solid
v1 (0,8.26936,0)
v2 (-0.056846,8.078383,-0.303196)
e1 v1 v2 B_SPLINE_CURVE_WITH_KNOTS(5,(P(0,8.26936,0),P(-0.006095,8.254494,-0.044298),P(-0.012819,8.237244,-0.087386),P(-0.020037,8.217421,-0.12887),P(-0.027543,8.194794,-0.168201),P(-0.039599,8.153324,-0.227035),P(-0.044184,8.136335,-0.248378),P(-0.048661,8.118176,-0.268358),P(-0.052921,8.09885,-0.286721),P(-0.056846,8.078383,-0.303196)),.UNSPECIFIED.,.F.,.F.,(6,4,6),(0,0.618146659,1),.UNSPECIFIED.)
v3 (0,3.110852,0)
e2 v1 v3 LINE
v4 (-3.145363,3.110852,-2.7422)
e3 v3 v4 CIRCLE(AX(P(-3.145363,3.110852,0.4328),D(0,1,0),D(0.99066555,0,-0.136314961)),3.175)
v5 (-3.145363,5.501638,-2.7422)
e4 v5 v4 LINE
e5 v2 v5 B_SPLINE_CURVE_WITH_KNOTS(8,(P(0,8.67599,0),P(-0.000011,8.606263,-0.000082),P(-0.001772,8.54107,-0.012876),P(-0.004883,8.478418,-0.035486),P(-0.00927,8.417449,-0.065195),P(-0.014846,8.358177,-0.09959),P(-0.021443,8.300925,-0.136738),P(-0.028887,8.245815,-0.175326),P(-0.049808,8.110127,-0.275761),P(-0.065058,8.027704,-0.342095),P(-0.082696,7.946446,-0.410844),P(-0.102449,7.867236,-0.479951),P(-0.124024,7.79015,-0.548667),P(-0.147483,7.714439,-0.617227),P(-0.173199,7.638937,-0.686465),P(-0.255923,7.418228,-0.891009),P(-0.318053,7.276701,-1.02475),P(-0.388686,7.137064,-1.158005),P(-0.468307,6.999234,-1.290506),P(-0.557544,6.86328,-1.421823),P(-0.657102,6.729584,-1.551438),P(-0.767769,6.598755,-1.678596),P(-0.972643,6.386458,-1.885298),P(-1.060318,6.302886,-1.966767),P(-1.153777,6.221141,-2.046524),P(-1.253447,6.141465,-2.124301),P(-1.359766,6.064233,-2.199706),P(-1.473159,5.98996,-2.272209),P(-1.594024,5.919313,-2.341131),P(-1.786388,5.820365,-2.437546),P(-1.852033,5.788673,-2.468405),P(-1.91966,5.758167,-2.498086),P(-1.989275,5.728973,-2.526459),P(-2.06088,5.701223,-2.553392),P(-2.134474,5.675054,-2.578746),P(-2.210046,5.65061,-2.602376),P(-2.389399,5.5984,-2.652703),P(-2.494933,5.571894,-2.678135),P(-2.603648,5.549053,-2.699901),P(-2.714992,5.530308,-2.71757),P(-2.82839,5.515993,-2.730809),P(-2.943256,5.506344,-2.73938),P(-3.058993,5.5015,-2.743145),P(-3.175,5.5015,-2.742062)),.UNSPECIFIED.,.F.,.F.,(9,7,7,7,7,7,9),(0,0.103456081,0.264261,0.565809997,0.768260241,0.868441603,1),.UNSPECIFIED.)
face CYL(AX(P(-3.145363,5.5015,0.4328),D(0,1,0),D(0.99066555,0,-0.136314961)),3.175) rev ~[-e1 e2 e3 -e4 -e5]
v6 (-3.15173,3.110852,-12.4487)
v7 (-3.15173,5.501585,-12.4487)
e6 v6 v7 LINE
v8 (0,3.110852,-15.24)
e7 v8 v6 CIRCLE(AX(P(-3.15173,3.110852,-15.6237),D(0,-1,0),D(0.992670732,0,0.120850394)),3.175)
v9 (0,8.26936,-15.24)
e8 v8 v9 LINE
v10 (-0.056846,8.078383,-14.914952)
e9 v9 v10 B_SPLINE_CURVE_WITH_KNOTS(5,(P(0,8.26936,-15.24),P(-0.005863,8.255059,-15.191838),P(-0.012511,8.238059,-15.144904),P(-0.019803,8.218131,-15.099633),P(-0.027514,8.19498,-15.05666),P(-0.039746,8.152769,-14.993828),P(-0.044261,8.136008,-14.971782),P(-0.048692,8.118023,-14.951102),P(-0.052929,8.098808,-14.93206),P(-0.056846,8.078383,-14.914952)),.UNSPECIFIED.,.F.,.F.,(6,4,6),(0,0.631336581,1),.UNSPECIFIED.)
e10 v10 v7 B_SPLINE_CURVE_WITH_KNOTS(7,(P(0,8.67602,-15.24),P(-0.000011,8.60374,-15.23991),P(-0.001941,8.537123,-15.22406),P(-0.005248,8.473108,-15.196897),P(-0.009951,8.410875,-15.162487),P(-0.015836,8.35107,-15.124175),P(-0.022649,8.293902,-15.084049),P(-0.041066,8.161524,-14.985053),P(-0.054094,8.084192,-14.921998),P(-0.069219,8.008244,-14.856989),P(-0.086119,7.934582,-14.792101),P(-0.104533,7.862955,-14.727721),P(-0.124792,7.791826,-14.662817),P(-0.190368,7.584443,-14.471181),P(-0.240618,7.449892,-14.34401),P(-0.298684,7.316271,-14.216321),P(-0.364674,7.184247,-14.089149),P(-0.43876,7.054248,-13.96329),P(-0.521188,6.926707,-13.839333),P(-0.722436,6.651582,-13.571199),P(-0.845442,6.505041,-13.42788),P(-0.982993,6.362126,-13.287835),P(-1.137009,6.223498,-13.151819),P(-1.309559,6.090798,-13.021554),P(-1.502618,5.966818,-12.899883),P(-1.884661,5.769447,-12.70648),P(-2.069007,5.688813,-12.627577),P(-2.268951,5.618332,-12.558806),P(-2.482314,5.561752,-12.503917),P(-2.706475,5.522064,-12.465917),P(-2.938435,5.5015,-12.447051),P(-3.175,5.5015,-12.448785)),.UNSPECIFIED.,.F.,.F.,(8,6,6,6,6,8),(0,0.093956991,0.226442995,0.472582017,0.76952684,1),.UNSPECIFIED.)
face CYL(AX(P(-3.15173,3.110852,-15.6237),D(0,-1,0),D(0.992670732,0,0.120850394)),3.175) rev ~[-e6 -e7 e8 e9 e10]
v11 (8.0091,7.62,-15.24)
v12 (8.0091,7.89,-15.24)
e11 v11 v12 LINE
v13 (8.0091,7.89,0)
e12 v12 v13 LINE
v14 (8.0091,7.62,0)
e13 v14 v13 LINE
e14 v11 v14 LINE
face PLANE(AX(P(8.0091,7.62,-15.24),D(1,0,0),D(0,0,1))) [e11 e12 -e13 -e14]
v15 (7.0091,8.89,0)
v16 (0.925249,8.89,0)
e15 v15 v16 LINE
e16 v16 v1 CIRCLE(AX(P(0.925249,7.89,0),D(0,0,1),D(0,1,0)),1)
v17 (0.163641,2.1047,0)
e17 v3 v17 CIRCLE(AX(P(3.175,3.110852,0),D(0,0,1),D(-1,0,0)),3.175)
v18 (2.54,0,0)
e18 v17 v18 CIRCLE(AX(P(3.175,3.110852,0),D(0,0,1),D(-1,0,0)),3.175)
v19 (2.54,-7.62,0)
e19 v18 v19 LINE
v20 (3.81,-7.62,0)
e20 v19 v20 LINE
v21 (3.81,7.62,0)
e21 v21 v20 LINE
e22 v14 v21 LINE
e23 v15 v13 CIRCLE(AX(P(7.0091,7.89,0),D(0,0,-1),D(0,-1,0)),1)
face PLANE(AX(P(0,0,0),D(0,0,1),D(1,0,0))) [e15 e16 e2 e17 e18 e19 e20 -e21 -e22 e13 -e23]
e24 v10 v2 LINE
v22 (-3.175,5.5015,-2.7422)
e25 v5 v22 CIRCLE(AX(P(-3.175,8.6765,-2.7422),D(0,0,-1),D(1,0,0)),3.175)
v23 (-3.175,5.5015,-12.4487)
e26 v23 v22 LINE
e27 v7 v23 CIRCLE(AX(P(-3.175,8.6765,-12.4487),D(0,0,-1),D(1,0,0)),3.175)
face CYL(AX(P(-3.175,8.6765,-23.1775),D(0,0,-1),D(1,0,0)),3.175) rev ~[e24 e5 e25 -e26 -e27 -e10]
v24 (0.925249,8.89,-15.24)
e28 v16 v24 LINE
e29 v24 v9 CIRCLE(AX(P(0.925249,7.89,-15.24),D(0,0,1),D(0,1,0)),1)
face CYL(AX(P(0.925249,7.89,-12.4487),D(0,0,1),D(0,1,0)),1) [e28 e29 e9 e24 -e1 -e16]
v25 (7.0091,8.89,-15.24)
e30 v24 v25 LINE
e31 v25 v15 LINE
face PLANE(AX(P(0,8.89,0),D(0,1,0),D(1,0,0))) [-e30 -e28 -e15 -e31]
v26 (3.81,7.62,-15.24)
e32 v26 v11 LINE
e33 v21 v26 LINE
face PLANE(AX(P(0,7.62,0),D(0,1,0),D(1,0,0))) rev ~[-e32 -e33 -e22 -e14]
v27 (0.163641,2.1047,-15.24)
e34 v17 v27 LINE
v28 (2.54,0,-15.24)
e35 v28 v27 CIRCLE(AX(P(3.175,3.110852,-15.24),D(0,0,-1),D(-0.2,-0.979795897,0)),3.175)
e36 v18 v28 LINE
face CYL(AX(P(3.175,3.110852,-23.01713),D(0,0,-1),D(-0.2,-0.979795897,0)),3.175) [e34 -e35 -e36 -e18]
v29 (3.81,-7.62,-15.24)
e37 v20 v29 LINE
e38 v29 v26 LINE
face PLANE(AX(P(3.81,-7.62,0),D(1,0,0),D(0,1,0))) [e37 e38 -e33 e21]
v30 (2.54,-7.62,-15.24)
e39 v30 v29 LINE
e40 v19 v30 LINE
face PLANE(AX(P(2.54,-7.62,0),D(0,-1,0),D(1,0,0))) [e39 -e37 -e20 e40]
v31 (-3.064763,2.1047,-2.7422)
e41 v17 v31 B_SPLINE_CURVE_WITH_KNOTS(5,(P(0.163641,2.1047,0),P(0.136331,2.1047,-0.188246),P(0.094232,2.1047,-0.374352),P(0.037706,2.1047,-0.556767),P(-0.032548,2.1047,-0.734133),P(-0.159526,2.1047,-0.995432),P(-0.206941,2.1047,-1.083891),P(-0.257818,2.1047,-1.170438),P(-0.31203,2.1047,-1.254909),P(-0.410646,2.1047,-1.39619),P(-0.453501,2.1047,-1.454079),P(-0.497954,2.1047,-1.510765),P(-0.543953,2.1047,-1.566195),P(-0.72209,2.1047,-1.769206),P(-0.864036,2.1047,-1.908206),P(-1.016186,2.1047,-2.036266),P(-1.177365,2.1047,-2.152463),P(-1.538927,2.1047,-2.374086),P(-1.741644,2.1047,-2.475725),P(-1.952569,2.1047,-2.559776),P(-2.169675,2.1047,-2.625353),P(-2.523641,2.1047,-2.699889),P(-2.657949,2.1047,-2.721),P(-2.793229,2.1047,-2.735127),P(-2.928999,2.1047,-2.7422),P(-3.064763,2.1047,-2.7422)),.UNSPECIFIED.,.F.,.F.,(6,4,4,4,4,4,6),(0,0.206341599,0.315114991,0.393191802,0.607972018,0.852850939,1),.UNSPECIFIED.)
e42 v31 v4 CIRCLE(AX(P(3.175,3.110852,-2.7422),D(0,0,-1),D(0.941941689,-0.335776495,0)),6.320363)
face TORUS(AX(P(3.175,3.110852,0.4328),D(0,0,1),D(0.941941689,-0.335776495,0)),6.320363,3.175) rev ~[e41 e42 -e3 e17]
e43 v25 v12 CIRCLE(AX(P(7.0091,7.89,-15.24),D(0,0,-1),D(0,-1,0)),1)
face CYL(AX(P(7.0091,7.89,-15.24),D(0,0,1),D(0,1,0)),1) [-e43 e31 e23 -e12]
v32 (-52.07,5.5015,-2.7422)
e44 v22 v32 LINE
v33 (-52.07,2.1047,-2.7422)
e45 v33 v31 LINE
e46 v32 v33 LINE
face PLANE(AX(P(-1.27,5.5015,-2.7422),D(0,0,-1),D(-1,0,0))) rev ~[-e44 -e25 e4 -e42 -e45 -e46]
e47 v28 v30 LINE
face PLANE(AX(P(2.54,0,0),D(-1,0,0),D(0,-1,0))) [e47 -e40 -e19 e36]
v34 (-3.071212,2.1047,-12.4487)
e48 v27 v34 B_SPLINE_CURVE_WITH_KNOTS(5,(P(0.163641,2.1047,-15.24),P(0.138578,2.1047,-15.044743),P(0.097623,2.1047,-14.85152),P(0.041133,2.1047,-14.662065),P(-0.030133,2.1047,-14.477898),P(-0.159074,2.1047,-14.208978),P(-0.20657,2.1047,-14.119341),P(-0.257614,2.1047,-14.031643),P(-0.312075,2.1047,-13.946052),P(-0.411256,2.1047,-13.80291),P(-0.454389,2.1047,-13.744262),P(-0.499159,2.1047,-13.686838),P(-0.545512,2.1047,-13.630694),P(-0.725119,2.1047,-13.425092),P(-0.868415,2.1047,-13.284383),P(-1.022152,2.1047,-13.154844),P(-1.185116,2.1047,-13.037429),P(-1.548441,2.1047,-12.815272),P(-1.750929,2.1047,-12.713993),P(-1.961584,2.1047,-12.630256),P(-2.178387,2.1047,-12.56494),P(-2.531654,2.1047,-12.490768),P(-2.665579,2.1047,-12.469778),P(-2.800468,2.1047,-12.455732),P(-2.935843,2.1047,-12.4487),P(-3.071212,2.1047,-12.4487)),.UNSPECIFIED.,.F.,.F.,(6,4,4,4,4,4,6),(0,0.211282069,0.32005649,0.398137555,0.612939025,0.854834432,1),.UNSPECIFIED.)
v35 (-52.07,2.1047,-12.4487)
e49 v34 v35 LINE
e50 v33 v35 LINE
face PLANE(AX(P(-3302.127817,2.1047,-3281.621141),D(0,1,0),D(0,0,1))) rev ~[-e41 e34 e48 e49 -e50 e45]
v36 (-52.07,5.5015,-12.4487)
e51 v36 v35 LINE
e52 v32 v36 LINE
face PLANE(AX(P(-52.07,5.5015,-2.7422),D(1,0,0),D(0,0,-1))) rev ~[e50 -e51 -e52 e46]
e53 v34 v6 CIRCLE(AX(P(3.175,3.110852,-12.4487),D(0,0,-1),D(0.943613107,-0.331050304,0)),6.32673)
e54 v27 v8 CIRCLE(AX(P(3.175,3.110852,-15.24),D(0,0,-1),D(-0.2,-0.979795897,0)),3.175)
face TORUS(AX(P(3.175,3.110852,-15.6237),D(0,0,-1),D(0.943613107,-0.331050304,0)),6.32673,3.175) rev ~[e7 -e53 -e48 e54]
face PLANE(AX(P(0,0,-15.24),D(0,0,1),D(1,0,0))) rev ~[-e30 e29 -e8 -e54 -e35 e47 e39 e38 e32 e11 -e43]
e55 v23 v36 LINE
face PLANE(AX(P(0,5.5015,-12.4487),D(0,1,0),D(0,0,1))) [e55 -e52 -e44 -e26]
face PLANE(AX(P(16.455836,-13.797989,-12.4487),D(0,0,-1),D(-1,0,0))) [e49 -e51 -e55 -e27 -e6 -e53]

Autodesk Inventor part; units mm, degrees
ref_plane "YZ Plane" through (0, 0, 0) normal (1, 0, 0) x (0, 1, 0)
ref_plane "XZ Plane" through (0, 0, 0) normal (0, 1, 0) x (-1, 0, 0)
ref_plane "XY Plane" through (0, 0, 0) normal (0, 0, 1) x (1, 0, 0)
sketch "Sketch1" plane through (0, 0, 0) normal (1, 0, 0) x (0, 1, 0)
  line L0 (0, 0) -> (7.62, 0)
  line L1 (7.62, 0) -> (7.62, -15.24)
  line L2 (7.62, -15.24) -> (0, -15.24)
  line L3 (0, -15.24) -> (0, 0)
  dimension "d0" = 7.62
  dimension "d1" = 15.24
extrude "Extrusion1" add sketch "Sketch1" along normal blind 7.62
ref_plane "Work Plane1" through (0, 3.81, 0) normal (0, 1, 0) x (1, 0, 0)
sketch "Sketch3" plane through (0, 0, 0) normal (-1, 0, 0) x (0, 0, 1)
  line L0 (-2.7422, 2.1047) -> (-12.4487, 2.1047)
  line L1 (-12.4487, 2.1047) -> (-12.4487, 5.5015)
  line L2 (-12.4487, 5.5015) -> (-2.7422, 5.5015)
  line L3 (-2.7422, 5.5015) -> (-2.7422, 2.1047)
  point P0 (0, 0)
extrude "Extrusion2" add sketch "Sketch3" along normal blind 1.27
sketch "Sketch4" plane through (0, 5.5015, -2.7422) normal (0, 1, 0) x (1, 0, 0)
  line L0 (-1.27, 9.7065) -> (-1.27, 0) projected
  line L1 (-1.27, 0) -> (-52.07, 0)
  line L2 (-52.07, 0) -> (-52.07, 9.7065)
  line L3 (-52.07, 9.7065) -> (-1.27, 9.7065)
  line L4 (-1.27, 9.7065) -> (-1.27, 0)
  point P0 (0, -2.7422)
  dimension "d6" = 50.8
extrude "Extrusion3" add sketch "Sketch4" against normal up to surface (3.3968 mm away)
sketch "Sketch5" plane through (7.62, 0, 0) normal (1, 0, 0) x (0, 0, -1)
  line L0 (15.24, 7.62) -> (15.24, 0) projected
  line L1 (0, 7.62) -> (15.24, 7.62) projected
  line L2 (15.24, 0) -> (0, 0)
  line L3 (0, 0) -> (0, 7.62)
  line L4 (0, 7.62) -> (15.24, 7.62)
  line L5 (15.24, 7.62) -> (15.24, 0)
extrude "Extrusion4" cut sketch "Sketch5" against normal blind 3.81
sketch "Sketch6" plane through (0, 7.62, 0) normal (0, 1, 0) x (1, 0, 0)
  line L0 (0, 15.24) -> (3.81, 15.24) projected
  line L1 (0, 15.24) -> (8.0091, 15.24)
  line L2 (8.0091, 15.24) -> (8.0091, 0)
  line L3 (8.0091, 0) -> (0, 0)
  line L4 (0, 0) -> (0, 15.24)
extrude "Extrusion5" add sketch "Sketch6" along normal blind 1.27
sketch "Sketch7" plane through (0, 0, 0) normal (0, 0, 1) x (1, 0, 0)
  line L0 (3.81, 0) -> (2.54, 0)
  line L1 (2.54, 0) -> (2.54, -7.62)
  line L2 (2.54, -7.62) -> (3.81, -7.62)
  line L3 (3.81, -7.62) -> (3.81, 0)
  point P0 (0, 0)
  dimension "d13" = 1.27
  dimension "d14" = 7.62
extrude "Extrusion6" add sketch "Sketch7" against normal up to surface (15.24 mm away)
fillet "Fillet1" radius 3.175 5 edges at (0, 0, -7.62) (0, 3.8031, -2.7422) (0, 2.1047, -7.5954) (0, 3.8031, -12.4487) (0, 5.5015, -7.5954)
fillet "Fillet2" radius 1 1 edges at (8.0091, 8.89, -7.62)
fillet "Fillet3" radius 1 1 edges at (0, 8.89, -7.62)
properties part number "straightBar"
